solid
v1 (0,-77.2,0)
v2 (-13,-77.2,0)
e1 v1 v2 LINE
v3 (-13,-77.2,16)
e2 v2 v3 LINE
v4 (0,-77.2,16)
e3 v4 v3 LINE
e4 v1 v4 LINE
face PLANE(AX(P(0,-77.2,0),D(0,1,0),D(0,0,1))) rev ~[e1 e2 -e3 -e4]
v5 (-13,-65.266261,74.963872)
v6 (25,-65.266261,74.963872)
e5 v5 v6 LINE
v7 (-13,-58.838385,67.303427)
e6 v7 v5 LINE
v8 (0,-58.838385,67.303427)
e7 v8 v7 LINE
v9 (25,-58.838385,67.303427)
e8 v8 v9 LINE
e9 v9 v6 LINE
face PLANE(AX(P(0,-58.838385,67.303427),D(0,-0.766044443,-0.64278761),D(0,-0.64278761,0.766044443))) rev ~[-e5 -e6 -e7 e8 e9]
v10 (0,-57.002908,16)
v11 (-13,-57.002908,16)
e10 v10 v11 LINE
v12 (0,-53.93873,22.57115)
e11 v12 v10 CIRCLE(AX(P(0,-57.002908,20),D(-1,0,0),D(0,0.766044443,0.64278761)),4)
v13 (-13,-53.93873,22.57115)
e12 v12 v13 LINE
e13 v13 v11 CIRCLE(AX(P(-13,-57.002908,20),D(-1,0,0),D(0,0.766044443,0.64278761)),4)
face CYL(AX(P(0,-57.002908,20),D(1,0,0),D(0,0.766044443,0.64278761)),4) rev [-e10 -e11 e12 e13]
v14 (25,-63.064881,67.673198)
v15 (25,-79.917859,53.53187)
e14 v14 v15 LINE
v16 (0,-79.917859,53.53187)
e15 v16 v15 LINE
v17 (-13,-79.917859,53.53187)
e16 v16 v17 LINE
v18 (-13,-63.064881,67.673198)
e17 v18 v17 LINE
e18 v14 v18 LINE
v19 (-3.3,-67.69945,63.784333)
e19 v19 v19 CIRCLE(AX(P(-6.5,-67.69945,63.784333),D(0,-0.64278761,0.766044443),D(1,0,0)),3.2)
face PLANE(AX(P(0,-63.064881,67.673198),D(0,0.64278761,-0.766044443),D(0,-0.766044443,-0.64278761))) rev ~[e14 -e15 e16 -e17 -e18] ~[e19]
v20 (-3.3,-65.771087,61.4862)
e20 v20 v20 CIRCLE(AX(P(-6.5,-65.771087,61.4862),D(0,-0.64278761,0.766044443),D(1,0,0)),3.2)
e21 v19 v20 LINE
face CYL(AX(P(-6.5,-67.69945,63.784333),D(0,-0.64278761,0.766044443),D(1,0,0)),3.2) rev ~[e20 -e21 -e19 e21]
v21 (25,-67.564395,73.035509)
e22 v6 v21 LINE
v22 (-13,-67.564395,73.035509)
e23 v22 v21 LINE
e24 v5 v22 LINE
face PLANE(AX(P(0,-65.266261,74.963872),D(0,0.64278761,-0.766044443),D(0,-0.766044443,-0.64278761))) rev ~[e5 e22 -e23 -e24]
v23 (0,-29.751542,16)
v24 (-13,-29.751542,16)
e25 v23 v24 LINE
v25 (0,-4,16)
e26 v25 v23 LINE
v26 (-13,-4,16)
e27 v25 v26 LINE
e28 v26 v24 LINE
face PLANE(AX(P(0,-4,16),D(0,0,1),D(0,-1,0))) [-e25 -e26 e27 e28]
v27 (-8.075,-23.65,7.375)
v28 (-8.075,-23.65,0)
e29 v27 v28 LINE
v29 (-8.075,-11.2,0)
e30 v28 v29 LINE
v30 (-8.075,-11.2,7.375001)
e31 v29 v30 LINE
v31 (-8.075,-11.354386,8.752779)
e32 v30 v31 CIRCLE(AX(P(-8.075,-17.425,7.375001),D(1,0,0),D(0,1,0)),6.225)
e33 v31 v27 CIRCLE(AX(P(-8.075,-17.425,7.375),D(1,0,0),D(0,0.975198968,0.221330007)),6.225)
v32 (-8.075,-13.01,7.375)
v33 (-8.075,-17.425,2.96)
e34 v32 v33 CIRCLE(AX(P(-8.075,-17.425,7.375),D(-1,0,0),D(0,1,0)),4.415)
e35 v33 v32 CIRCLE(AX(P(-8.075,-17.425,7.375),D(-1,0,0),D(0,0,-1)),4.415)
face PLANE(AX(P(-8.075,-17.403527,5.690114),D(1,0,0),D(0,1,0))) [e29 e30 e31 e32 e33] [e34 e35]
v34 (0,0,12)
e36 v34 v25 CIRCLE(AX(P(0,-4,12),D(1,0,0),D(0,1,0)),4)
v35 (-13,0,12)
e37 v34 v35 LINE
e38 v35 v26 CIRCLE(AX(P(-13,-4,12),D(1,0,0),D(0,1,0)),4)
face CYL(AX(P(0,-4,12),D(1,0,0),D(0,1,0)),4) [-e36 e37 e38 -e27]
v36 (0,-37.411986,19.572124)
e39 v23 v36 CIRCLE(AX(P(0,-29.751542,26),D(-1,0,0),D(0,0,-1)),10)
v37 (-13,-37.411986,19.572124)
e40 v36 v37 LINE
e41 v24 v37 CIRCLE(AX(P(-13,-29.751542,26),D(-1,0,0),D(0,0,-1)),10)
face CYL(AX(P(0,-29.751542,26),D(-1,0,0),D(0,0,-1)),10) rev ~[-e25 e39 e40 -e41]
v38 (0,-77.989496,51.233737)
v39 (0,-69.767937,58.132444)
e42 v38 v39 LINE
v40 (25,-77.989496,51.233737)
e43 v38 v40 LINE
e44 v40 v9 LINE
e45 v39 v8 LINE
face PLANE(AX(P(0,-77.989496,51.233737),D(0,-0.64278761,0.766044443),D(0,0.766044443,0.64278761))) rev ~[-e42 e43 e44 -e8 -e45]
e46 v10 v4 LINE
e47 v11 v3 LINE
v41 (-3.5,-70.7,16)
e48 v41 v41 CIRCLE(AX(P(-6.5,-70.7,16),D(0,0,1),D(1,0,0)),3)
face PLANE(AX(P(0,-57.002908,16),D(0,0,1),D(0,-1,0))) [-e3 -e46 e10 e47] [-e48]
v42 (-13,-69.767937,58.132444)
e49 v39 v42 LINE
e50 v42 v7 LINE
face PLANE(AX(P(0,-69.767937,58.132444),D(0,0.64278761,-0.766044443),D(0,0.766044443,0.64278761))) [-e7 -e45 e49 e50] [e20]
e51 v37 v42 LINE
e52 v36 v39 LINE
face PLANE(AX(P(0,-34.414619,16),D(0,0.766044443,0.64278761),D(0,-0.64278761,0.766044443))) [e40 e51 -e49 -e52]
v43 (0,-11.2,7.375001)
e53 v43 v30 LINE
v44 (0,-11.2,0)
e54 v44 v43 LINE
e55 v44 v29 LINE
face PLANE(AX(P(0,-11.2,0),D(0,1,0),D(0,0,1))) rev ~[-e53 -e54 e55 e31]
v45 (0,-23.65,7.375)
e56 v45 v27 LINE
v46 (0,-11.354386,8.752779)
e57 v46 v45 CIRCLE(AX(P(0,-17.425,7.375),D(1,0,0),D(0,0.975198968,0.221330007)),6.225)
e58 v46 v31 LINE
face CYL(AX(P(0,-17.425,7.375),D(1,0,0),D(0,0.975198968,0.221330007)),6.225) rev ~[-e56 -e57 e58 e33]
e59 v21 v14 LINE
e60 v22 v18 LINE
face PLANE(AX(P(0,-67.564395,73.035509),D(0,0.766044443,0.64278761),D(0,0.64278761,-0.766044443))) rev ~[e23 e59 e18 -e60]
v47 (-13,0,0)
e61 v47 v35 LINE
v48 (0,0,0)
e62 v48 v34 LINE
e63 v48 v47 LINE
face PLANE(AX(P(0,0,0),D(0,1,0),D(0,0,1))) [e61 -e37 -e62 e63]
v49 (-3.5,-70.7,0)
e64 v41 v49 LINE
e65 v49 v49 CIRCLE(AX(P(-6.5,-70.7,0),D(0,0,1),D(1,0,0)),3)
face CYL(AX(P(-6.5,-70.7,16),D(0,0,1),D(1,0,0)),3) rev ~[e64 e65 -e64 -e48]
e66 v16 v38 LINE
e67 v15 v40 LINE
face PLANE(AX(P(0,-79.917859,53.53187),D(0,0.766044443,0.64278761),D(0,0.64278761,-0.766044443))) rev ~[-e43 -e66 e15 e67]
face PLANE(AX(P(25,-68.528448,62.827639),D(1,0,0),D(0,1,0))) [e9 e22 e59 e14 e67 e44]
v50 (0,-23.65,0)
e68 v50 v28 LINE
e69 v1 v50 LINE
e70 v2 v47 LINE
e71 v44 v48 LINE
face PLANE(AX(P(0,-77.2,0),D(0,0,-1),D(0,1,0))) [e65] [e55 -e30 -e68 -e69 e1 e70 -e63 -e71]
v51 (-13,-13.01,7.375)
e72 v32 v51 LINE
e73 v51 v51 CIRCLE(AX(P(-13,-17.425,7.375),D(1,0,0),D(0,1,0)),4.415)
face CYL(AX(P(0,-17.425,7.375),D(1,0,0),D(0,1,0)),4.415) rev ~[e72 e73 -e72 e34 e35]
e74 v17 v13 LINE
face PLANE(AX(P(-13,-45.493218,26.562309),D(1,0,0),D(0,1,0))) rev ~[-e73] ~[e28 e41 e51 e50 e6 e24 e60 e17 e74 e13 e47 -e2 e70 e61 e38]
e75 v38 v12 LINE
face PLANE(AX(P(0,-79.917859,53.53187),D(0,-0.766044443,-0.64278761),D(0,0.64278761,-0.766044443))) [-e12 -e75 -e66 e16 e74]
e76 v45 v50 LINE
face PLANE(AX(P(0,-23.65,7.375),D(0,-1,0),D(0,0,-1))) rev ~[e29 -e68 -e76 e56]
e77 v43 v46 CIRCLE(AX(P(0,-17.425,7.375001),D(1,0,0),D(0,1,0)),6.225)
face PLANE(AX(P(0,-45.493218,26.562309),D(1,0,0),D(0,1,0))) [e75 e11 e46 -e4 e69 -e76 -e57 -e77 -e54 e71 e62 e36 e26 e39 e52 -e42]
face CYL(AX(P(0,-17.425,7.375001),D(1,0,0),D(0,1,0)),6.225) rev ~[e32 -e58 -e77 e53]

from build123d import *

# Parameters (mm, degrees)
F0_R      = 4.415
F0_W      = 3.025
F0_H      = 16
F0_W_2    = 7.0735459991
F1_DEPTH  = 13
F3_DEPTH  = 8.075
F4_R      = 10
F5_R      = 3
F6_DEPTH  = 25
F7_R      = 3.2
F8_DEPTH  = 11.1
F10_DEPTH = 25


# Not quite as in the source:
# - ends of sketch curves that miss each other by under 0.0002 mm in the source are joined


with BuildPart() as f1:
    # F0 (on Right) → F1 (new body)
    with BuildSketch(Plane.YZ):
        with BuildLine():
            Line((-11.2, 0), (0, 0))
            Line((0, 0), (0, 12))
            ThreePointArc((0, 12), (-1.1715728753, 14.8284271247), (-4, 16))
            Line((-4, 16), (-34.4146185314, 16))
            Line((-34.4146185314, 16), (-69.7679370642, 58.1324443715))
            Line((-69.7679370642, 58.1324443715), (-58.8383850945, 67.3034273983))
            Line((-58.8383850945, 67.3034273983), (-65.2662611913, 74.9638718294))
            Line((-65.2662611913, 74.9638718294), (-67.5643945207, 73.0355090004))
            Line((-67.5643945207, 73.0355090004), (-63.0648812529, 67.6731978986))
            Line((-63.0648812529, 67.6731978986), (-79.9178590015, 53.5318704855))
            Line((-79.9178590015, 53.5318704855), (-53.9387302293, 22.5711504387))
            ThreePointArc((-53.9387302293, 22.5711504387), (-53.3776768537, 18.309526953), (-57.0029080018, 16))
            Line((-57.0029080018, 16), (-67.1014540009, 16))
            Line((-67.1014540009, 16), (-67.1014540009, 0))
            Line((-67.1014540009, 0), (-64.0764540009, 0))
            Line((-64.0764540009, 0), (-23.65, 0))
            Line((-23.65, 0), (-23.65, 7.375))
            ThreePointArc((-23.65, 7.375), (-21.8267397129, 11.7767397129), (-17.425, 13.6))
            ThreePointArc((-17.425, 13.6), (-13.0232602871, 11.7767397129), (-11.2, 7.375))
            Line((-11.2, 7.375), (-11.2, 0))
        make_face()
        with BuildLine():
            Line((-23.65, 0), (-11.2, 0))
            Line((-11.2, 0), (-11.2, 7.375))
            ThreePointArc((-11.2, 7.375), (-13.0232602871, 11.7767397129), (-17.425, 13.6))
            ThreePointArc((-17.425, 13.6), (-21.8267397129, 11.7767397129), (-23.65, 7.375))
            Line((-23.65, 7.375), (-23.65, 0))
        make_face()
        with Locations((-17.425, 7.375)):
            Circle(F0_R, mode=Mode.SUBTRACT)
        with Locations((-68.6139540009, 8)):
            Rectangle(F0_W, F0_H)
        with Locations((-73.6632270005, 8)):
            Rectangle(F0_W_2, F0_H)
    extrude(amount=-F1_DEPTH)

    # F2 (on face) → F3 (cut)
    with BuildSketch(Plane.YZ):
        with BuildLine():
            Line((-17.425, 0), (-11.2, 0))
            Line((-11.2, 0), (-11.2, 7.3750006942))
            ThreePointArc((-11.2, 7.3750006942), (-11.2387169647, 8.068201392), (-11.3543862514, 8.7527792377))
            ThreePointArc((-11.3543862514, 8.7527792377), (-18.1182010341, 13.5612829976), (-23.65, 7.375))
            Line((-23.65, 7.375), (-23.65, 0))
            Line((-23.65, 0), (-17.425, 0))
        make_face()
        with BuildLine():
            ThreePointArc((-13.01, 7.375), (-14.3031235611, 4.2531235611), (-17.425, 2.96))
            ThreePointArc((-17.425, 2.96), (-20.5468764389, 10.4968764389), (-13.01, 7.375))
        make_face(mode=Mode.SUBTRACT)
    extrude(amount=-F3_DEPTH, mode=Mode.SUBTRACT)

    # F4
    f4_edges = [f1.edges().sort_by_distance(p)[0] for p in [
        (-6.5, -34.414619, 16),
    ]]
    fillet(f4_edges, radius=F4_R)

    # F5 (on face) → F6 (cut)
    with BuildSketch(Plane.XY.offset(16)):
        with Locations((-6.5, -70.7)):
            Circle(F5_R)
    extrude(amount=-F6_DEPTH, mode=Mode.SUBTRACT)

    # F7 (on face) → F8 (cut)
    with BuildSketch(Plane(origin=(0, -59.3794347551, 70.7656546956), x_dir=(1, 0, 0), z_dir=(0, -0.6427876097, 0.7660444431))):
        with Locations((-6.5, -10.8610087227)):
            Circle(F7_R)
    extrude(amount=-F8_DEPTH, mode=Mode.SUBTRACT)

    # F9 (on face) → F10 (join)
    with BuildSketch(Plane.YZ):
        Polygon((-77.9894961724, 51.2337371561), (-58.8383850945, 67.3034273983), (-65.2662611913, 74.9638718294), (-67.5643945207, 73.0355090004), (-63.0648812529, 67.6731978986), (-79.9178590015, 53.5318704855), align=None)
    extrude(amount=F10_DEPTH)


solid = f1.part
